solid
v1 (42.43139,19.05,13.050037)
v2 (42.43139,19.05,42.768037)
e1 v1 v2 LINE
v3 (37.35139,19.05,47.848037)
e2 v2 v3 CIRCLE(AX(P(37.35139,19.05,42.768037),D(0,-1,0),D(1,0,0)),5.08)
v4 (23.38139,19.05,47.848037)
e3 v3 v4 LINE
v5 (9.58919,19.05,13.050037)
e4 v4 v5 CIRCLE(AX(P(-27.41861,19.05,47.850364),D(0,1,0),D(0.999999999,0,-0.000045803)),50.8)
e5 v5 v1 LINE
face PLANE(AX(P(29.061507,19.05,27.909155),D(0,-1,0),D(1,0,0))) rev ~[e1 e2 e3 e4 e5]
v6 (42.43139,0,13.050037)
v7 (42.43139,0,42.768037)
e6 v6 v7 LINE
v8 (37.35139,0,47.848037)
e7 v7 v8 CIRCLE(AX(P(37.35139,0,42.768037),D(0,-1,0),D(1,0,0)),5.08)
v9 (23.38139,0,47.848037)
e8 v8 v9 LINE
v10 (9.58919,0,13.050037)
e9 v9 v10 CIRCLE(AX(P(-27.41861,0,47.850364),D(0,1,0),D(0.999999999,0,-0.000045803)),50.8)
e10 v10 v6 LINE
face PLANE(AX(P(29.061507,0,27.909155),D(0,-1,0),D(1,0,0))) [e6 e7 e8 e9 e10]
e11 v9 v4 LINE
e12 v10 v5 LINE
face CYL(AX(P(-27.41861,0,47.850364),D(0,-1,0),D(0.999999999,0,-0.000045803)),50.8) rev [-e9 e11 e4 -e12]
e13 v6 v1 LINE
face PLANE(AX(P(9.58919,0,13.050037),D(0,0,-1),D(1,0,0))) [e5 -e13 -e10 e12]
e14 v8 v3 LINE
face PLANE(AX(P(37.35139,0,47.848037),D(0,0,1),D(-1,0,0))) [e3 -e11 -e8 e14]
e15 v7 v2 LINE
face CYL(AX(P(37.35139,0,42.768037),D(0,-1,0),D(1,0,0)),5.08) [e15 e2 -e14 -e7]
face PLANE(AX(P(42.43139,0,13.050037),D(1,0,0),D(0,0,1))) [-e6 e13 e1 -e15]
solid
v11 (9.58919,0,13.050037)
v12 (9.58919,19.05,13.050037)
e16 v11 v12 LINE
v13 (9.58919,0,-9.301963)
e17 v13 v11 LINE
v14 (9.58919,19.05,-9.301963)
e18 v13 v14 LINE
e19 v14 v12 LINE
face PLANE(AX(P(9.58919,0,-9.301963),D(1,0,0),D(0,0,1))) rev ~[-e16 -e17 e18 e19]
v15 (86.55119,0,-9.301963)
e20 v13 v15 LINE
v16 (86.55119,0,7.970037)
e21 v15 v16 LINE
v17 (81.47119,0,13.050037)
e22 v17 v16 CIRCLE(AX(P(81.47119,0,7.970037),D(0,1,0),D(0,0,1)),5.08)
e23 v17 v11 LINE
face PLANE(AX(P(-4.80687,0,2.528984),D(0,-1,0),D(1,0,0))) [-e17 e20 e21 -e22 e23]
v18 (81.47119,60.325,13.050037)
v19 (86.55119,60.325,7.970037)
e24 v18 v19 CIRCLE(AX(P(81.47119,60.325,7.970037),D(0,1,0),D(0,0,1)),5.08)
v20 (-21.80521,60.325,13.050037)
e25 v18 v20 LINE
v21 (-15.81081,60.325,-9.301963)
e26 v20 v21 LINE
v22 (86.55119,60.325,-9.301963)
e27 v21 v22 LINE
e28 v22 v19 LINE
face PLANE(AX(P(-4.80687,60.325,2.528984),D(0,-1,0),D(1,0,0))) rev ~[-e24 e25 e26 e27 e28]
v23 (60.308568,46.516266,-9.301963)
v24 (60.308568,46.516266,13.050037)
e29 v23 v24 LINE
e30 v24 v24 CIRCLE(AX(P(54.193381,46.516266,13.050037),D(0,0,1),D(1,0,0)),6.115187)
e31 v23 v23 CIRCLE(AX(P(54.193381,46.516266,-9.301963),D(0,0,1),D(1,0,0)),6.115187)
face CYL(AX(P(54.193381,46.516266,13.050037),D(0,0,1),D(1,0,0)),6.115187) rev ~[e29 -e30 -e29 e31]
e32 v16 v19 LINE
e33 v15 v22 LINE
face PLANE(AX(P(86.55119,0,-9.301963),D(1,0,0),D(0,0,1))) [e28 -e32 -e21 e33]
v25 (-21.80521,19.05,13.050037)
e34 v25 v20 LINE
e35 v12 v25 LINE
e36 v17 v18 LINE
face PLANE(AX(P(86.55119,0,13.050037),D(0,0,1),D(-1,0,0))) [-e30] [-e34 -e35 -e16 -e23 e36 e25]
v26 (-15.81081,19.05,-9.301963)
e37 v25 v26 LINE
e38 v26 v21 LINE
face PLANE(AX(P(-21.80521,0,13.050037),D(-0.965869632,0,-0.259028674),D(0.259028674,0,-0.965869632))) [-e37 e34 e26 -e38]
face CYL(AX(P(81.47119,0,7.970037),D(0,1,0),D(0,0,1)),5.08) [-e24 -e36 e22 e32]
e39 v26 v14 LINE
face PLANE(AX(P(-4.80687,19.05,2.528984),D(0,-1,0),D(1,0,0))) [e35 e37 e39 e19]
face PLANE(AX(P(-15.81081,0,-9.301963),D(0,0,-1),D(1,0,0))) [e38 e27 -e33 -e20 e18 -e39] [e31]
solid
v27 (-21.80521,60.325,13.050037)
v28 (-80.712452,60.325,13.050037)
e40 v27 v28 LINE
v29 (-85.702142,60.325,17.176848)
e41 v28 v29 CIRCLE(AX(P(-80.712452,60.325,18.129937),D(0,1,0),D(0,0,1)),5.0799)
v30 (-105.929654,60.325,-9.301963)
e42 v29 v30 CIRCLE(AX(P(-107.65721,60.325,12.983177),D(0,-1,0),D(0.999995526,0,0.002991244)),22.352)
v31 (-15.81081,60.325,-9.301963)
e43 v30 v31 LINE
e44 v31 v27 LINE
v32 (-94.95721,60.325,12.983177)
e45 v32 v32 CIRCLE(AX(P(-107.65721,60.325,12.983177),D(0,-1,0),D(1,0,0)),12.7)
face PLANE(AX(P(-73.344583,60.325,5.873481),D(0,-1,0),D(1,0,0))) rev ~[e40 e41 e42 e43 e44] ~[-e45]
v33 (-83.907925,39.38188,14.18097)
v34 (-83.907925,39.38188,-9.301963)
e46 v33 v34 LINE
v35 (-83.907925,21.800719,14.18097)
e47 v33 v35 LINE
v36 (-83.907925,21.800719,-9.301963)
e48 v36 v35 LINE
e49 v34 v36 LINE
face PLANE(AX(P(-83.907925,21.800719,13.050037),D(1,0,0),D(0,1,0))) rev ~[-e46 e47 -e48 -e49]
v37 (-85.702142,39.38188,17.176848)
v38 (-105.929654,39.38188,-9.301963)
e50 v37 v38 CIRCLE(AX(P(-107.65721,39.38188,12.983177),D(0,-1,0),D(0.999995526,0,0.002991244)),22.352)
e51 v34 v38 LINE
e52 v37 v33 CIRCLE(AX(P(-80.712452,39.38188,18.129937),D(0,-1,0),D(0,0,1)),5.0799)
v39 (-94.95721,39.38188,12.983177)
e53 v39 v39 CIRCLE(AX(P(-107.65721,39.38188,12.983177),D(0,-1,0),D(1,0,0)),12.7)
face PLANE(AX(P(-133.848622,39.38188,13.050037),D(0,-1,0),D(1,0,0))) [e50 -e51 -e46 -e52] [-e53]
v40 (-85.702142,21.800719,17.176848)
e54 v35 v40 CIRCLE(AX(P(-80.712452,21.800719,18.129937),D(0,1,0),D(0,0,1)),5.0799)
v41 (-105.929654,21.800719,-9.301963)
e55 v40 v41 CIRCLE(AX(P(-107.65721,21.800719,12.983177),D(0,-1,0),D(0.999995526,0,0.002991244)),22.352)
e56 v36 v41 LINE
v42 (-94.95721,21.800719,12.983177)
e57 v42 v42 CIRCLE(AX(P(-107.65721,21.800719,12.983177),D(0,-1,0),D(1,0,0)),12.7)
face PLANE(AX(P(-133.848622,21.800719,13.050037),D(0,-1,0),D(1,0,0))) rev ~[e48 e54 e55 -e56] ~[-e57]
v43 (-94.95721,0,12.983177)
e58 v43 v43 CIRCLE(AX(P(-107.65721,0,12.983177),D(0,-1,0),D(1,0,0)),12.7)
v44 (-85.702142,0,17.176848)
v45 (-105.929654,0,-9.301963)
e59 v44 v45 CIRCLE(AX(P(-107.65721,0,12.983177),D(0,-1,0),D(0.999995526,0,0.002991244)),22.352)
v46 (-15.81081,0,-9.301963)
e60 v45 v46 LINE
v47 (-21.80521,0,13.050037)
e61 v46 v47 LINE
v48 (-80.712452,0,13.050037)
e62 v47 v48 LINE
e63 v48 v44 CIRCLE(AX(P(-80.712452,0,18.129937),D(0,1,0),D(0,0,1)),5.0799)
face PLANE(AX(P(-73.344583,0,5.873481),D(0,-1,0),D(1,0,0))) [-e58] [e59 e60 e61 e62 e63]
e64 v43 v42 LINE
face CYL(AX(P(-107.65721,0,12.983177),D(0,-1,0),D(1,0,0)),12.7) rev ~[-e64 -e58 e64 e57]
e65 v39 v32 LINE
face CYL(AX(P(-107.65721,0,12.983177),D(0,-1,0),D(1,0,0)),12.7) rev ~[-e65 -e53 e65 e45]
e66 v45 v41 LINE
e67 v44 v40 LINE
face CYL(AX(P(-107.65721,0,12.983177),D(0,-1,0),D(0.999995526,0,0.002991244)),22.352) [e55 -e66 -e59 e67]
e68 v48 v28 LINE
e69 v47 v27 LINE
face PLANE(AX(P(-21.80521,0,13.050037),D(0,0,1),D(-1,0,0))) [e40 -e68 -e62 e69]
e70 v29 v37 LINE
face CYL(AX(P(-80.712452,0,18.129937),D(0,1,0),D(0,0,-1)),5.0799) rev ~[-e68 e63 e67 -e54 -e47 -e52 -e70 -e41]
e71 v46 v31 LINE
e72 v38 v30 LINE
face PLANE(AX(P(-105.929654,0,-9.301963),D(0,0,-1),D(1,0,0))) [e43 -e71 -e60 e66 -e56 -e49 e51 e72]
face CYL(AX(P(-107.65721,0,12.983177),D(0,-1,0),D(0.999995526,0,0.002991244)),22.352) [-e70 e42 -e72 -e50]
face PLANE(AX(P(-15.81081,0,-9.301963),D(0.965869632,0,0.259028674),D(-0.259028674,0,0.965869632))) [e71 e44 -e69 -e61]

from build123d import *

# Parameters (mm, degrees)
F0_R          = 12.7
F1_DEPTH      = 60.325
F2_DEPTH      = 60.325
F3_DEPTH      = 19.05
F4_DEPTH      = 19.05
F5_W          = 49.9406978488
F5_H          = 17.5811611116
F5_R          = 6.1151869595
F6_DEPTH      = 34.799
F6_DEPTH_BACK = 25.4
F7_R          = 5.0799
F8_R          = 5.08


# Not quite as in the source:
# - a fillet or chamfer is up to 0.001 mm smaller than in the source, because OpenCascade refuses the exact size


with BuildPart() as f1:
    # F0 (on Front) → F1 (new body)
    with BuildSketch(Plane.XZ):
        with BuildLine():
            Line((-21.805210435, 13.050036882), (-85.3053104329, 13.050036882))
            ThreePointArc((-85.3053104329, 13.050036882), (-124.0845666969, 28.1408106558), (-105.929653819, -9.301963118))
            Line((-105.929653819, -9.301963118), (-15.810810435, -9.301963118))
            Line((-15.810810435, -9.301963118), (-21.805210435, 13.050036882))
        make_face()
        with Locations((-107.657210435, 12.9831765975)):
            Circle(F0_R, mode=Mode.SUBTRACT)
    extrude(amount=-F1_DEPTH)


with BuildPart() as f2:
    # F0 (on Front) → F2 (new body)
    with BuildSketch(Plane.XZ):
        Polygon((9.589189565, 13.050036882), (-21.805210435, 13.050036882), (-15.810810435, -9.301963118), (9.589189565, -9.301963118), align=None)
        Polygon((42.431389565, 13.050036882), (9.589189565, 13.050036882), (9.589189565, -9.301963118), (86.551189565, -9.301963118), (86.551189565, 13.050036882), align=None)
    extrude(amount=-F2_DEPTH)

    # F0 (on Front) → F4 (cut)
    with BuildSketch(Plane.XZ):
        Polygon((9.589189565, 13.050036882), (-21.805210435, 13.050036882), (-15.810810435, -9.301963118), (9.589189565, -9.301963118), align=None)
    extrude(amount=-F4_DEPTH, mode=Mode.SUBTRACT)


with BuildPart() as f3:
    # F0 (on Front) → F3 (new body)
    with BuildSketch(Plane.XZ):
        with BuildLine():
            ThreePointArc((23.381389565, 47.848036882), (19.8072049266, 29.1323945161), (9.589189565, 13.050036882))
            Line((9.589189565, 13.050036882), (42.431389565, 13.050036882))
            Line((42.431389565, 13.050036882), (42.431389565, 42.768036882))
            ThreePointArc((42.431389565, 42.768036882), (40.9434920134, 46.3601393304), (37.351389565, 47.848036882))
            Line((37.351389565, 47.848036882), (23.381389565, 47.848036882))
        make_face()
    extrude(amount=-F3_DEPTH)


with BuildPart() as f6_tool:
    # F5 (on face) → F6 (new body, two sides)
    with BuildSketch(Plane.XY.offset(13.050036882)) as f6_sk:
        with Locations((-108.8782735169, 30.5912997574)):
            Rectangle(F5_W, F5_H)
        with Locations((54.1933812201, 46.5162657201)):
            Circle(F5_R)
    extrude(amount=F6_DEPTH)
    extrude(f6_sk.sketch, amount=-F6_DEPTH_BACK)


with BuildPart() as f1_1:
    add(f1.part)

    # F6: cut by f6_tool
    add(f6_tool.part, mode=Mode.SUBTRACT)

    # F7 (radius 5.08 in the source; OpenCascade refuses exactly that, so slightly less here)
    f7_edges = [f1_1.edges().sort_by_distance(p)[0] for p in [
        (-85.30531, 10.90036, 13.050037),
    ]]
    fillet(f7_edges, radius=F7_R)


with BuildPart() as f2_1:
    add(f2.part)

    # F6: cut by f6_tool
    add(f6_tool.part, mode=Mode.SUBTRACT)

    # F8
    f8_edges = [f2_1.edges().sort_by_distance(p)[0] for p in [
        (86.55119, 30.1625, 13.050037),
    ]]
    fillet(f8_edges, radius=F8_R)


solid = Compound([f3.part, f1_1.part, f2_1.part])
